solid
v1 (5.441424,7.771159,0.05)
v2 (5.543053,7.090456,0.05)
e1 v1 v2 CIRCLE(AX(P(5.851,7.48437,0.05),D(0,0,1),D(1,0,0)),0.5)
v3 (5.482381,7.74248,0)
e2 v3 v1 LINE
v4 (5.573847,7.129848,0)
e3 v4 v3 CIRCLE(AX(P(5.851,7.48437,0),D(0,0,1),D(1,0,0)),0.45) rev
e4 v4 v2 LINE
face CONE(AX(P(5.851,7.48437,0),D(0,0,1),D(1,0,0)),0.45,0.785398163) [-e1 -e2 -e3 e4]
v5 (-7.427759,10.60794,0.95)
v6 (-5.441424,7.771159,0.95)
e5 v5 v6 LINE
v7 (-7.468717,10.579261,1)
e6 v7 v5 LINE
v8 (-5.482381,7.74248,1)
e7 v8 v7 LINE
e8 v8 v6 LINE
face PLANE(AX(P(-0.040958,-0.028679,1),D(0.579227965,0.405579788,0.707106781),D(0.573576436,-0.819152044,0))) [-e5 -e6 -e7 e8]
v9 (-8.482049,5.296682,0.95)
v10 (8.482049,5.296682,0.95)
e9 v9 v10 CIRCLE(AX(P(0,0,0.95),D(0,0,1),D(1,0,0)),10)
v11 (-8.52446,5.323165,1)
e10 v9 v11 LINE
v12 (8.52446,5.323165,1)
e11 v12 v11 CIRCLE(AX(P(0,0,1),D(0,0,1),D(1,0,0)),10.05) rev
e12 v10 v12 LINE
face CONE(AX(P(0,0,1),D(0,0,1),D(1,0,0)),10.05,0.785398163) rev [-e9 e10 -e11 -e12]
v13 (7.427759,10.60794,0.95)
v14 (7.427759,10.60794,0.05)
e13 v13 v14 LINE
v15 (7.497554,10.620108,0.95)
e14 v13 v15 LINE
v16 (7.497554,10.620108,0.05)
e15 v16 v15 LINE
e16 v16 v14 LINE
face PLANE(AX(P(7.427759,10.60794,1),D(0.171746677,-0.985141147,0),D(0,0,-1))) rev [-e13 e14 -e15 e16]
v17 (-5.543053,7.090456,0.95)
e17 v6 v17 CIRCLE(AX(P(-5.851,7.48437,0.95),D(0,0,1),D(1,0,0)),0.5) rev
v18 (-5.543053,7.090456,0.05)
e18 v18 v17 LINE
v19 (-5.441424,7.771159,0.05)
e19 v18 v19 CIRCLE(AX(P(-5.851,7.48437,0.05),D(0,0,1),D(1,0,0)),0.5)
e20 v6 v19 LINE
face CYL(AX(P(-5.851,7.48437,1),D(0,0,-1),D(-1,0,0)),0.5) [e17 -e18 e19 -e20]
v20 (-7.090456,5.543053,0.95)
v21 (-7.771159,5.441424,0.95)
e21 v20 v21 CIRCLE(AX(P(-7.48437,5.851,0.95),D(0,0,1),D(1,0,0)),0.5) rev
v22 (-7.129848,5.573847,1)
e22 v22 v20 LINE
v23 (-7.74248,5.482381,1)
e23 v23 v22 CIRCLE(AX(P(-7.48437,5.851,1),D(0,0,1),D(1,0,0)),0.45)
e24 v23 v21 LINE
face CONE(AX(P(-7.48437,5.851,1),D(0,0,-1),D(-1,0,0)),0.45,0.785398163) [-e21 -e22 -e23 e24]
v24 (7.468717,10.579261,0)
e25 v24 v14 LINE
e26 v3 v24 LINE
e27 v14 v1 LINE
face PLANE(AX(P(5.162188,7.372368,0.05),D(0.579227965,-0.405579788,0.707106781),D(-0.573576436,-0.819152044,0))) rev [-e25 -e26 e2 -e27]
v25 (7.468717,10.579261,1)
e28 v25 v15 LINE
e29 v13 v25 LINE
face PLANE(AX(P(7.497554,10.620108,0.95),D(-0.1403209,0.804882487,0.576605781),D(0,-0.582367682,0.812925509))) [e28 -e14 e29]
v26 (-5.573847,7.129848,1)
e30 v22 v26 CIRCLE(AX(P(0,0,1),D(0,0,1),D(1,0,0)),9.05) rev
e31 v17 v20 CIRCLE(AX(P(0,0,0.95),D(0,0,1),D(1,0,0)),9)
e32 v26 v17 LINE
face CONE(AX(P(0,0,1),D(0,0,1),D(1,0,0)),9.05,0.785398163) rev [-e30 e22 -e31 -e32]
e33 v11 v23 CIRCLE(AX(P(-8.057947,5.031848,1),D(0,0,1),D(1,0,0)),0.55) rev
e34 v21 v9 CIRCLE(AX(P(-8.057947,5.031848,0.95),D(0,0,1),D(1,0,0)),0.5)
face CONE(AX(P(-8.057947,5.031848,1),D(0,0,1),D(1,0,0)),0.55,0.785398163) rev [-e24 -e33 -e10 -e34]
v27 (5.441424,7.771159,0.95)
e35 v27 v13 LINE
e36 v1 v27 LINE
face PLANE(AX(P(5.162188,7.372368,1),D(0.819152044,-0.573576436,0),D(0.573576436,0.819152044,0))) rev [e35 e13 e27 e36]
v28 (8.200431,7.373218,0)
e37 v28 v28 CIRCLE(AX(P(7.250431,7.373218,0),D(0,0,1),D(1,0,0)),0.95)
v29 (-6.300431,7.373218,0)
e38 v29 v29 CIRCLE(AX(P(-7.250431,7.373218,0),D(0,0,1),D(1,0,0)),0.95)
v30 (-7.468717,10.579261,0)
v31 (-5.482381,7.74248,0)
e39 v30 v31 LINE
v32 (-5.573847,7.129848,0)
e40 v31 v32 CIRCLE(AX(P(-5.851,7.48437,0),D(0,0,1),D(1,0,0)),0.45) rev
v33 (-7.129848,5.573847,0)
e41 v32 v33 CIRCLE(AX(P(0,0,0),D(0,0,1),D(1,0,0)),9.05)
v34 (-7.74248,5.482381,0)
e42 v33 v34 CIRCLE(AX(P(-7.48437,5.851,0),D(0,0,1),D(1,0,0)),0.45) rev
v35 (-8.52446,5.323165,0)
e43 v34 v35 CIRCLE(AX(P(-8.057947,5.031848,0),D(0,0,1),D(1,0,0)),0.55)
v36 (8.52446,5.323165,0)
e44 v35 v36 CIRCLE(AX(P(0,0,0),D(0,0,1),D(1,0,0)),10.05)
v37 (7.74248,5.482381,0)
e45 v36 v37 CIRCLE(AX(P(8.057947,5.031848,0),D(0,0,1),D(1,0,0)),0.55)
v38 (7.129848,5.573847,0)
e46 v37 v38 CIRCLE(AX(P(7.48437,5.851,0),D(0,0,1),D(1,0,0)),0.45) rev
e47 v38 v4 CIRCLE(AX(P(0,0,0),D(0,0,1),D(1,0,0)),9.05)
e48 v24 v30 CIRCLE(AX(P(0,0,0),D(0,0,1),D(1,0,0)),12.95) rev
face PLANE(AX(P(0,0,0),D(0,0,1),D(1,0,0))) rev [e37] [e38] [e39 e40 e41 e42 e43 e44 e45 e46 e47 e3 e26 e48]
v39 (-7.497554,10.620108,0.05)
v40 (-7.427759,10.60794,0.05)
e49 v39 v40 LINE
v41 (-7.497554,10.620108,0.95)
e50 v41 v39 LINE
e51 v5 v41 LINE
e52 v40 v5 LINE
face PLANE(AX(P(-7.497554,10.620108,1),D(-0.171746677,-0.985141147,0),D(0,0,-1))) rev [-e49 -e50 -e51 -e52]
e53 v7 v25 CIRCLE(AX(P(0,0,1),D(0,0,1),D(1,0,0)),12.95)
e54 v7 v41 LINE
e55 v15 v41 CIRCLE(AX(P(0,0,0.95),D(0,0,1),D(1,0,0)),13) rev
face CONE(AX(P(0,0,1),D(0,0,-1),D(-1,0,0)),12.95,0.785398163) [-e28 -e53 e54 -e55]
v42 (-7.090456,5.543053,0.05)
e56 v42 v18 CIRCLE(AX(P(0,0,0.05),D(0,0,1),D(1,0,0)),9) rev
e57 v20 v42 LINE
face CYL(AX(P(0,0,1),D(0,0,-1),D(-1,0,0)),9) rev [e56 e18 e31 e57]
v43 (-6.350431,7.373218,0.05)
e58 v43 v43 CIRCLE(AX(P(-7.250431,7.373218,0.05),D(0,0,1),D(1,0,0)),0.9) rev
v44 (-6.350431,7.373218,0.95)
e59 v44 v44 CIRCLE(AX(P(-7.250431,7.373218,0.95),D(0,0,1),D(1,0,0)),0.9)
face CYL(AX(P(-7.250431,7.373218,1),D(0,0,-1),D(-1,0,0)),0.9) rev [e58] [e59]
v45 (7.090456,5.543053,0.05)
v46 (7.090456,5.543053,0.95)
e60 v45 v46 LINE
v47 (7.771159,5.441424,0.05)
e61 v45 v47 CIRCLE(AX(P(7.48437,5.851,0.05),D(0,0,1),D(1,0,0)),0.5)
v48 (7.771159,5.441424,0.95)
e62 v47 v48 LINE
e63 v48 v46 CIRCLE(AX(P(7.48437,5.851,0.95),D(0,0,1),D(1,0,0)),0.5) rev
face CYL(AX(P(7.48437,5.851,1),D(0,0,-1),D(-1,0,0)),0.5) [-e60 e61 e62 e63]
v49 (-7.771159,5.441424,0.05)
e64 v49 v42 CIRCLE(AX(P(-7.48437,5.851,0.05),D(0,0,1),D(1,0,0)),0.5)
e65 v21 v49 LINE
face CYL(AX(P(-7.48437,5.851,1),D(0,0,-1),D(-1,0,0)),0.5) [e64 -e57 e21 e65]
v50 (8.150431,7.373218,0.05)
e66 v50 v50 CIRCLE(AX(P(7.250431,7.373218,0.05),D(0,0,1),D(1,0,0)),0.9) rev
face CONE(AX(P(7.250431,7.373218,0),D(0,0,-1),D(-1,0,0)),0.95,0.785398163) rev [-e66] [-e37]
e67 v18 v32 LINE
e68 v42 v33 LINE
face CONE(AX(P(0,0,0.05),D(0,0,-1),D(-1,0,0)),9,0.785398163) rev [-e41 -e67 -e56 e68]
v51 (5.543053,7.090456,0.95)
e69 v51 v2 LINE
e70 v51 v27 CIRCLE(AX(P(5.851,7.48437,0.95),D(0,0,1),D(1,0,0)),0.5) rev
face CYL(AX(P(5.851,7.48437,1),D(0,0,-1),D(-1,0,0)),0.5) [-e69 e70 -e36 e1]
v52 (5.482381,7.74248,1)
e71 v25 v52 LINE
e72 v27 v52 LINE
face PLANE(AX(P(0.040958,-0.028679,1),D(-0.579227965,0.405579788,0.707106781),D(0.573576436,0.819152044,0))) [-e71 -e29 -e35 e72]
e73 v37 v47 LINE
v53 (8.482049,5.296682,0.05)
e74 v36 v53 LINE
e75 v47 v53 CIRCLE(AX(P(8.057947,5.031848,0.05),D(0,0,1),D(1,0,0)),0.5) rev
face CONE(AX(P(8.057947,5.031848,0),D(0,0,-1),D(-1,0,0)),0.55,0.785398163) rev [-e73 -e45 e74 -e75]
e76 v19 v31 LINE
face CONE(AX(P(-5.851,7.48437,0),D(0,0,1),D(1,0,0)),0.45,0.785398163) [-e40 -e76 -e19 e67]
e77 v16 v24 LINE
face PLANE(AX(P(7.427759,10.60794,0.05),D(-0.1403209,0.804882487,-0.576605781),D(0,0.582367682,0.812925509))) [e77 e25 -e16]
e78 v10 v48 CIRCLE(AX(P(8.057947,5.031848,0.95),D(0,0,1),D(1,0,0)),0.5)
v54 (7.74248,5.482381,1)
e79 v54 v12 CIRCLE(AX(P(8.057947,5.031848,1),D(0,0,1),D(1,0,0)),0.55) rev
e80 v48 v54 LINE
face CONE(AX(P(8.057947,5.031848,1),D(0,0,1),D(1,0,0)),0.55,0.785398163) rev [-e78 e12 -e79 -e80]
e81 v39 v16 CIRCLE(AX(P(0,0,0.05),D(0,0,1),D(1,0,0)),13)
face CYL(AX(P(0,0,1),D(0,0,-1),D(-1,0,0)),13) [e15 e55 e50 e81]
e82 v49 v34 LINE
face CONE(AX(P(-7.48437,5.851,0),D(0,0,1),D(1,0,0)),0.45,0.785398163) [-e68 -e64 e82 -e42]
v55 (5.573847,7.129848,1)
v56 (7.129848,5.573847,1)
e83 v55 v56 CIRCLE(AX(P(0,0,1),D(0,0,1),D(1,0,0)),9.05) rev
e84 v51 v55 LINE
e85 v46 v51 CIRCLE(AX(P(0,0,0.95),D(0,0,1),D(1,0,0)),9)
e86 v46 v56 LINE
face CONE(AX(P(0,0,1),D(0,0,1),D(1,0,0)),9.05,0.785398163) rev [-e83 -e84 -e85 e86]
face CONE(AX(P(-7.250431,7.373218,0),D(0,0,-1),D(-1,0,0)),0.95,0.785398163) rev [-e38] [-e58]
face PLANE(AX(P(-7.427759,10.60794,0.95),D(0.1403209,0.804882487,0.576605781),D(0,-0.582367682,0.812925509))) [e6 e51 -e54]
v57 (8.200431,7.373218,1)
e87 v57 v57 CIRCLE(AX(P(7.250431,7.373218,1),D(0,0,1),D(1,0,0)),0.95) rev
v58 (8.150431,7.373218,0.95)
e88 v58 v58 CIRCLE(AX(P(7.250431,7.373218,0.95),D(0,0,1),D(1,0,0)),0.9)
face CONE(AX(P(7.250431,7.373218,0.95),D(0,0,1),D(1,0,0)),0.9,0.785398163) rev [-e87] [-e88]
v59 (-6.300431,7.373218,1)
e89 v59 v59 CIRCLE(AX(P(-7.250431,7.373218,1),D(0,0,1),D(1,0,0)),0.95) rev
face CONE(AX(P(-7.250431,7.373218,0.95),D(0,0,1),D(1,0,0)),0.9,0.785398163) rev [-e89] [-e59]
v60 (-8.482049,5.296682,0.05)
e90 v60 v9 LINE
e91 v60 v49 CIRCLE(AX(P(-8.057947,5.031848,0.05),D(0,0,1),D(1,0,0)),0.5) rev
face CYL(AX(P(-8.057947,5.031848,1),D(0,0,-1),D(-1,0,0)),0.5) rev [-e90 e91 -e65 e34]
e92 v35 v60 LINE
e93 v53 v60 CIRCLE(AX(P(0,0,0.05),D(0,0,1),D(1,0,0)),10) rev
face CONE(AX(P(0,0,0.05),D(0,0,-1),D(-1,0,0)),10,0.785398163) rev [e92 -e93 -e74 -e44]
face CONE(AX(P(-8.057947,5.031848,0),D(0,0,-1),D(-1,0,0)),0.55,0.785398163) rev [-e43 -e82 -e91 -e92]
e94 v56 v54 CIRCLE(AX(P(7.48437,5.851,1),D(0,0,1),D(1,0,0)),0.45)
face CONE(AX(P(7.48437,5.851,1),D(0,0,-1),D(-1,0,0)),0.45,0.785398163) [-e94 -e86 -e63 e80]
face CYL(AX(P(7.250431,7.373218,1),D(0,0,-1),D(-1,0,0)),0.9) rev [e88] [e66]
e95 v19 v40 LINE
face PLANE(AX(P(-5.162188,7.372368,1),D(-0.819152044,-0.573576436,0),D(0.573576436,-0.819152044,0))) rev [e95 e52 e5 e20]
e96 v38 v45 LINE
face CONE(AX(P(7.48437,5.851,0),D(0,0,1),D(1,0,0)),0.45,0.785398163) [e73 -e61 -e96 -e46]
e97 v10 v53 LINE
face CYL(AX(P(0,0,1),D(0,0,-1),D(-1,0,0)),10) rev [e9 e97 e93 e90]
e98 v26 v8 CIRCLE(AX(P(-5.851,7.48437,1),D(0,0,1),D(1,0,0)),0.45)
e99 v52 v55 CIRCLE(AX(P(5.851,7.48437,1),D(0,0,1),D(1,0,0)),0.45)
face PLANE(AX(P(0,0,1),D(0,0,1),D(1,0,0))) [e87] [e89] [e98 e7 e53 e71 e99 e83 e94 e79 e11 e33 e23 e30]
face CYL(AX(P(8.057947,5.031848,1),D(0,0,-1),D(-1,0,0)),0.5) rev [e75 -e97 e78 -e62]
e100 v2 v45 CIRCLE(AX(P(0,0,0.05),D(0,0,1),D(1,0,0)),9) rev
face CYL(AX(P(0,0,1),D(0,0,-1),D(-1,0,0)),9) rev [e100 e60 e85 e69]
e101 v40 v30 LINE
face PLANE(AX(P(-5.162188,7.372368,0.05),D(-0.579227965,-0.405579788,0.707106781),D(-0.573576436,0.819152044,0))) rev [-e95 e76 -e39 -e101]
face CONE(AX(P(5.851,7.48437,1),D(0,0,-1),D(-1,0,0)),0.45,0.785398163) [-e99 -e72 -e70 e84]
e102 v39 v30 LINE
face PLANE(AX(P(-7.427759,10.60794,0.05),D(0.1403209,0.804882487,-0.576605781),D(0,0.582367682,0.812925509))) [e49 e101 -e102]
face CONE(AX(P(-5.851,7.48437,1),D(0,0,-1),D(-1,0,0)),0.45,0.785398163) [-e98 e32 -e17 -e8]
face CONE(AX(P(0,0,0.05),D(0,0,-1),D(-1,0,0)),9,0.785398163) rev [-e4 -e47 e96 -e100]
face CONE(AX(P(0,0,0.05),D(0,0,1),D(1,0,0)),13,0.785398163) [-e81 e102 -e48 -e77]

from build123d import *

# Parameters (mm, degrees)
SCHIZZO1_R                   = 0.9
ESTRUSIONE_ESTRUSIONE1_DEPTH = 1
RACCORDO2_R                  = 0.5
SMUSSO2_SIZE                 = 0.05


with BuildPart() as part:
    # Schizzo1 → Estrusione-Estrusione1 (new body)
    with BuildSketch(Plane.XY):
        with BuildLine():
            Line((5.162187927, 7.372368399), (7.456493673, 10.648976576))
            ThreePointArc((7.456493673, 10.648976576), (0, -13), (-7.456493673, 10.648976576))
            Line((-7.456493673, 10.648976576), (-5.162187927, 7.372368399))
            ThreePointArc((-5.162187927, 7.372368399), (-6.363961031, 6.363961031), (-7.372368399, 5.162187927))
            Line((-7.372368399, 5.162187927), (-8.191520443, 5.735764364))
            ThreePointArc((-8.191520443, 5.735764364), (0, -10), (8.191520443, 5.735764364))
            Line((8.191520443, 5.735764364), (7.372368399, 5.162187927))
            ThreePointArc((7.372368399, 5.162187927), (6.363961031, 6.363961031), (5.162187927, 7.372368399))
        make_face()
        with Locations((-7.250430621, 7.373218425)):
            Circle(SCHIZZO1_R, mode=Mode.SUBTRACT)
        with Locations(Location((7.250430621, 7.373218425, 0), (0, 0, 180))):
            Circle(SCHIZZO1_R, mode=Mode.SUBTRACT)
    extrude(amount=ESTRUSIONE_ESTRUSIONE1_DEPTH)

    # Raccordo2
    raccordo2_edges = [part.edges().sort_by_distance(p)[0] for p in [
        (5.162187927, 7.372368399, 0.5),
        (7.372368399, 5.162187927, 0.5),
        (8.191520443, 5.735764364, 0.5),
        (-5.162187927, 7.372368399, 0.5),
        (-7.372368399, 5.162187927, 0.5),
        (-8.191520443, 5.735764364, 0.5),
    ]]
    fillet(raccordo2_edges, radius=RACCORDO2_R - 0.0001)  # a hair under: the kernel refuses the full size

    # Smusso2
    smusso2_edges = [part.edges().sort_by_distance(p)[0] for p in [
        (0, -13, 1),
        (6.448931556, 9.210028747, 1),
        (7.456493673, 10.648976576, 0.5),
        (-7.456493673, 10.648976576, 0.5),
        (-8.150430621, 7.373218425, 0),
        (-8.150430621, 7.373218425, 1),
        (8.150430621, 7.373218425, 0),
        (8.150430621, 7.373218425, 1),
        (6.363961031, 6.363961031, 0),
        (6.363961031, 6.363961031, 1),
        (-6.363961031, 6.363961031, 0),
        (0, -10, 0),
        (-6.448931556, 9.210028747, 0),
        (-7.410530845, 5.356443953, 0),
        (-5.356443953, 7.410530845, 0),
        (7.410530845, 5.356443953, 0),
        (5.356443953, 7.410530845, 0),
        (-6.363961031, 6.363961031, 1),
        (-6.448931556, 9.210028747, 1),
        (0, -10, 1),
        (-7.410530845, 5.356443953, 1),
        (-5.356443953, 7.410530845, 1),
        (7.410530845, 5.356443953, 1),
        (5.356443953, 7.410530845, 1),
        (8.157709655, 5.521840362, 0),
        (8.157709655, 5.521840362, 1),
        (-8.157709655, 5.521840362, 0),
        (-8.157709655, 5.521840362, 1),
        (6.448931556, 9.210028747, 0),
        (0, -13, 0),
    ]]
    chamfer(smusso2_edges, length=SMUSSO2_SIZE)


solid = part.part
